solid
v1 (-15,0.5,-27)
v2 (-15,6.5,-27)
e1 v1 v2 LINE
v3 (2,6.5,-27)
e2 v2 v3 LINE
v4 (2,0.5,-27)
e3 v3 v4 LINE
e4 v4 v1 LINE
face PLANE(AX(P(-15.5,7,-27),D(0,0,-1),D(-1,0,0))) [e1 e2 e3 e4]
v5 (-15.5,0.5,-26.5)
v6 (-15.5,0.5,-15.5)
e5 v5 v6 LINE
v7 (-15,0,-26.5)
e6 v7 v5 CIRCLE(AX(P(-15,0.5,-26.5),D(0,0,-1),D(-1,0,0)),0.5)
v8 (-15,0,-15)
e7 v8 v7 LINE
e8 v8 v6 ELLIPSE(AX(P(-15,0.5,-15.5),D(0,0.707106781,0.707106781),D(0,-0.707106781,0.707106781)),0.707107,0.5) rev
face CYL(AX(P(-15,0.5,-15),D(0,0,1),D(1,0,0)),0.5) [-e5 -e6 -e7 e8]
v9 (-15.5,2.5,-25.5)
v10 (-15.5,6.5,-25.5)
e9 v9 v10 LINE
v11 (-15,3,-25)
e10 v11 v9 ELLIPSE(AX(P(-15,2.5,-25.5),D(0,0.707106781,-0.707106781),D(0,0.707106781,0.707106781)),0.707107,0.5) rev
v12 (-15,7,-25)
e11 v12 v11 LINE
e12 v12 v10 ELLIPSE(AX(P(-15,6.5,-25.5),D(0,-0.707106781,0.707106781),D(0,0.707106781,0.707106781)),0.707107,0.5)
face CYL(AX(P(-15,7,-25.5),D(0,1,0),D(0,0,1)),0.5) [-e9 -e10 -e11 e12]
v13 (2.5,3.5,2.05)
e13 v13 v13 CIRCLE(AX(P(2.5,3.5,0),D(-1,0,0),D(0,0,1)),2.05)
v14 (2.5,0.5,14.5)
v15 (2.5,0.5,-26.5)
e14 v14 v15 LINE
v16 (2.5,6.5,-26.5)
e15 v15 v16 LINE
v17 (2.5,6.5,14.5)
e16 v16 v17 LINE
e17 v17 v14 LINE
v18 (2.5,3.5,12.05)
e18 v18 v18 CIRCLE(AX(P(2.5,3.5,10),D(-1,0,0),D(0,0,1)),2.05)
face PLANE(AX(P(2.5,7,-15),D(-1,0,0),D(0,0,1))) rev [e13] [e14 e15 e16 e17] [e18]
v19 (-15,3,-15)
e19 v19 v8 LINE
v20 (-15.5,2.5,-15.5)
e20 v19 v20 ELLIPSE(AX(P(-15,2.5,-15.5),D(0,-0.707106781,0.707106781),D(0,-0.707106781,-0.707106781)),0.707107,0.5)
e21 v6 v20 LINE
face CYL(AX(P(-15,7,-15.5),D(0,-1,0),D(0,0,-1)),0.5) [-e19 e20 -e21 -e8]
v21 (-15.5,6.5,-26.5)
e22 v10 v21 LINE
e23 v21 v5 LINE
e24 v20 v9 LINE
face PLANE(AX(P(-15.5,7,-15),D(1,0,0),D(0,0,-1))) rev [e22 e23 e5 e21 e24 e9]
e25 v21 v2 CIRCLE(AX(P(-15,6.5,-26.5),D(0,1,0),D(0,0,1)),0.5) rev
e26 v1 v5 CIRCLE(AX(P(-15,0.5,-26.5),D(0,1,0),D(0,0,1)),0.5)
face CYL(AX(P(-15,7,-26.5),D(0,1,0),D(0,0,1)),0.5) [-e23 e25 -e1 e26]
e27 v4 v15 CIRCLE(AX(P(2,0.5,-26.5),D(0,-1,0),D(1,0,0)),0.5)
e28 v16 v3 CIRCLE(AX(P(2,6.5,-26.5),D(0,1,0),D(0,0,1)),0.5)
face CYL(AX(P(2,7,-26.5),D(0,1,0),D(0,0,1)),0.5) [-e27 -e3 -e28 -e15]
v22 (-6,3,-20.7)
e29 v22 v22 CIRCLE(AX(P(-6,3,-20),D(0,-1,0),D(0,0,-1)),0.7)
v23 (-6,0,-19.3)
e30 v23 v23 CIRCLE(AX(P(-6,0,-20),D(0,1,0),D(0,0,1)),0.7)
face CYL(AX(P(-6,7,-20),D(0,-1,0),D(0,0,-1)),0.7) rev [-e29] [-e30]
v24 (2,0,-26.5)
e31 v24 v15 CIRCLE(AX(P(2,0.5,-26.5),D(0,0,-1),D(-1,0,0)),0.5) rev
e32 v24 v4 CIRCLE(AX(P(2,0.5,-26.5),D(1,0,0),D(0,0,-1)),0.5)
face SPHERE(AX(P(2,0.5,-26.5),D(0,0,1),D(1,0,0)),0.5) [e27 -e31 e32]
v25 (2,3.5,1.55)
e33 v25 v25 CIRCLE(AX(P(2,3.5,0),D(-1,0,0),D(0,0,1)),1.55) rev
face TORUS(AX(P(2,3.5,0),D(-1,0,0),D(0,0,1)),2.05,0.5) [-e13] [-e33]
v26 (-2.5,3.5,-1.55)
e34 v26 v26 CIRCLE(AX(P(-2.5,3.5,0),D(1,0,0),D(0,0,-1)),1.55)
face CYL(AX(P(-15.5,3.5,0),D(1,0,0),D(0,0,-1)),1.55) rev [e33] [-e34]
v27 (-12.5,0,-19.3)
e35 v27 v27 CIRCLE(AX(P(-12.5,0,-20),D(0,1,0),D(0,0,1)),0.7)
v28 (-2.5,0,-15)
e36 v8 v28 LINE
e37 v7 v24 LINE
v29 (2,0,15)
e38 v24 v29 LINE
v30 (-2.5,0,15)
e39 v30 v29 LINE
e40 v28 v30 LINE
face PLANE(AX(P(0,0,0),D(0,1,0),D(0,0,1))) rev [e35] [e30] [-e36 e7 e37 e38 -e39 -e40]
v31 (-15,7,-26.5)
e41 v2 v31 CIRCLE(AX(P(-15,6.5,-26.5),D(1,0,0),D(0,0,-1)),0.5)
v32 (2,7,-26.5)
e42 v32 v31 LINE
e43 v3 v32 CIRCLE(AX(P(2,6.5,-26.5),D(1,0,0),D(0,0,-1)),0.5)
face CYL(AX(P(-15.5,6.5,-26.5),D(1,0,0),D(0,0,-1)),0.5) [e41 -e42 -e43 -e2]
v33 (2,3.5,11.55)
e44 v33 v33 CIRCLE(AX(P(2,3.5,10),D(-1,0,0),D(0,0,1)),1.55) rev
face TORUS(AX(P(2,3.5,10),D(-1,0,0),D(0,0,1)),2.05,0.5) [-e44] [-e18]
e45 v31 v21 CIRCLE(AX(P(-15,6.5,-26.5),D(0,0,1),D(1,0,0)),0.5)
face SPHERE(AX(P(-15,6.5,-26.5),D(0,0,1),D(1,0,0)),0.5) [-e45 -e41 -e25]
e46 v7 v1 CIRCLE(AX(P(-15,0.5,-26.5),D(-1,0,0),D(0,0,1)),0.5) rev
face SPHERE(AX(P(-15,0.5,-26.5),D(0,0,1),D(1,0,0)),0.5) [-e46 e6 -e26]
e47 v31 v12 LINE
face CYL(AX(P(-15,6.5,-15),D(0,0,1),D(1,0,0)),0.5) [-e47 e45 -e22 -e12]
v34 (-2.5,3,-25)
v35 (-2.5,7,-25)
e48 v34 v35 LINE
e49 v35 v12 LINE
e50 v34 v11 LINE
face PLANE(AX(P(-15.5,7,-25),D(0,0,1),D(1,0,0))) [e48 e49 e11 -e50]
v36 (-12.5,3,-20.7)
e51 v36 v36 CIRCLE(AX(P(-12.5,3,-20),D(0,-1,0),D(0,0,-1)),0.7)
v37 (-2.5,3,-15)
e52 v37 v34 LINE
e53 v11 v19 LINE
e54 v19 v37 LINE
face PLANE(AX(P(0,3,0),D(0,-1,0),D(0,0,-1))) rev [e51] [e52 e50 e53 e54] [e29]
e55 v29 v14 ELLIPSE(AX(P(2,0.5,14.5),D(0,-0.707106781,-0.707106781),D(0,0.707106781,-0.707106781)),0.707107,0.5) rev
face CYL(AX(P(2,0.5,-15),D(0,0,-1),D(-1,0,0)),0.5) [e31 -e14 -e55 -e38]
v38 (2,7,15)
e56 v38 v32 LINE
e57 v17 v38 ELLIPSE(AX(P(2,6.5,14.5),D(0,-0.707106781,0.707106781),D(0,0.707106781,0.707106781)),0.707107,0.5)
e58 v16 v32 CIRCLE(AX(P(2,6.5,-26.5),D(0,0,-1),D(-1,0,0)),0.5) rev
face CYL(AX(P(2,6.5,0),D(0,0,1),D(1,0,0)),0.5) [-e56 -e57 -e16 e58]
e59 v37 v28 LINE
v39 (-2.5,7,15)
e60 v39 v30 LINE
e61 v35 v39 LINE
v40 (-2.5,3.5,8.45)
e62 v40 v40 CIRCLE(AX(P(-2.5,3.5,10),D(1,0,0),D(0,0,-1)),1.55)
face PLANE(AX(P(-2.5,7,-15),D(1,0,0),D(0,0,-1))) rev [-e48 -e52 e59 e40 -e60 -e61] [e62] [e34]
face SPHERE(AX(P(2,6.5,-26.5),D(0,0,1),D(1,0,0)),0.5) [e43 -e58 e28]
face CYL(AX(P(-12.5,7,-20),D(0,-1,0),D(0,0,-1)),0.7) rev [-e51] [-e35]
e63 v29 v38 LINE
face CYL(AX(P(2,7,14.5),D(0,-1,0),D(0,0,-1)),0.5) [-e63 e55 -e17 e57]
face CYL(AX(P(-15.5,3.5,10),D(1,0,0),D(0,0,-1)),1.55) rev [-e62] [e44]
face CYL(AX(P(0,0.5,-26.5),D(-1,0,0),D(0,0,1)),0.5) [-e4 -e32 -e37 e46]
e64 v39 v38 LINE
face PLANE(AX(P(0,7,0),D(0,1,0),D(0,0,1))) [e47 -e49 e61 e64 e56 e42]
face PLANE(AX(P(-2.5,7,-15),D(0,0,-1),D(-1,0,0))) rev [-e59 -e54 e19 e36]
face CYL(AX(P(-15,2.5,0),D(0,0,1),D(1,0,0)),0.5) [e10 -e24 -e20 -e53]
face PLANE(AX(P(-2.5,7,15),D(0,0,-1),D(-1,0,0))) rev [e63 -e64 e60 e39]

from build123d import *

# Parameters (mm, degrees)
SKETCH_1_R          = 0.7
EXTRUDE_1_DEPTH     = 7
SKETCH_2_R          = 1.55
CUT_EXTRUDE_1_DEPTH = 32.591137998
SKETCH_3_W          = 13
SKETCH_3_H          = 10
CUT_EXTRUDE_2_DEPTH = 4
SKETCH_4_W          = 18
SKETCH_4_H          = 2
EXTRUDE_2_DEPTH     = 7
FILLET_1_R          = 0.5
FILLET_2_R          = 0.5


with BuildPart() as part:
    # 草图1 → 凸台-拉伸1 (new body)
    with BuildSketch(Plane(origin=(0, 0, 0), x_dir=(1, 0, 0), z_dir=(0, 1, 0))):
        Polygon((-2.5, 15), (-2.5, -15), (2.5, -15), (2.5, 15), (2.5, 25), (-15.5, 25), (-15.5, 15), align=None)
        with Locations(Location((-12.5, 20, 0), (0, 0, 270))):
            Circle(SKETCH_1_R, mode=Mode.SUBTRACT)
        with Locations(Location((-6, 20, 0), (0, 0, 270))):
            Circle(SKETCH_1_R, mode=Mode.SUBTRACT)
    extrude(amount=EXTRUDE_1_DEPTH)

    # 草图2 → 切除-拉伸1 (cut, through all)
    with BuildSketch(Plane(origin=(2.5, 0, 0), x_dir=(0, 0, -1), z_dir=(1, 0, 0))):
        with Locations((-10, 3.5)):
            Circle(SKETCH_2_R)
        with Locations((0, 3.5)):
            Circle(SKETCH_2_R)
    extrude(amount=-CUT_EXTRUDE_1_DEPTH, mode=Mode.SUBTRACT)

    # 草图3 → 切除-拉伸2 (cut)
    with BuildSketch(Plane(origin=(0, 7, 0), x_dir=(1, 0, 0), z_dir=(0, 1, 0))):
        with Locations((-9, 20)):
            Rectangle(SKETCH_3_W, SKETCH_3_H)
    extrude(amount=-CUT_EXTRUDE_2_DEPTH, mode=Mode.SUBTRACT)

    # 草图4 → 凸台-拉伸2 (add)
    with BuildSketch(Plane.XZ):
        with Locations((-6.5, -26)):
            Rectangle(SKETCH_4_W, SKETCH_4_H)
    extrude(amount=-EXTRUDE_2_DEPTH)

    # 圆角1
    fillet_1_edges = [part.edges().sort_by_distance(p)[0] for p in [
        (2.5, 3.5, 15),
        (2.5, 3.5, 11.55),
        (2.5, 3.5, 1.55),
        (2.5, 7, -6),
        (-15.5, 3.5, -27),
        (-6.5, 7, -27),
        (2.5, 3.5, -27),
        (-6.5, 0, -27),
        (2.5, 0, -6),
    ]]
    fillet(fillet_1_edges, radius=FILLET_1_R)

    # 圆角2
    # the kernel refuses this fillet: 0.5 mm, written as the material it takes off along each edge
    with BuildSketch(Plane(origin=(-15, 6.5, -26.5), x_dir=(-1, 0, 0), z_dir=(0, 1, 0))) as fillet_2_piece_1_section:
        Polygon((0, 0), (FILLET_2_R, 0), (FILLET_2_R, -FILLET_2_R), (0, -FILLET_2_R), align=None)
    fillet_2_piece_1 = extrude(amount=FILLET_2_R, mode=Mode.PRIVATE)
    fillet_2_piece_1 = fillet_2_piece_1 - Plane(origin=(-15, 6.5, -26.5), x_dir=(0.7071067811865475, 0, 0.7071067811865475), z_dir=(0, 1, 0)) * Sphere(FILLET_2_R, mode=Mode.PRIVATE)
    add(fillet_2_piece_1, mode=Mode.SUBTRACT)
    with BuildSketch(Plane(origin=(-15, 0.5, -26.5), x_dir=(-1, 0, 0), z_dir=(0, -1, 0))) as fillet_2_piece_2_section:
        Polygon((0, 0), (FILLET_2_R, 0), (FILLET_2_R, FILLET_2_R), (0, FILLET_2_R), align=None)
    fillet_2_piece_2 = extrude(amount=FILLET_2_R, mode=Mode.PRIVATE)
    fillet_2_piece_2 = fillet_2_piece_2 - Plane(origin=(-15, 0.5, -26.5), x_dir=(0.7071067811865475, 0, 0.7071067811865475), z_dir=(0, -1, 0)) * Sphere(FILLET_2_R, mode=Mode.PRIVATE)
    add(fillet_2_piece_2, mode=Mode.SUBTRACT)
    with BuildSketch(Plane(origin=(-15.5, -1.25, -15), x_dir=(1, 0, 0), z_dir=(0, 1, 0))) as fillet_2_piece_3:
        with BuildLine():
            CenterArc((FILLET_2_R, FILLET_2_R), FILLET_2_R, 180, 90)
            Line((0, FILLET_2_R), (0, 0))
            Line((0, 0), (FILLET_2_R, 0))
        make_face()
    extrude(amount=5.5, mode=Mode.SUBTRACT)
    with BuildSketch(Plane(origin=(-15.5, 3, -25), x_dir=(1, 0, 0), z_dir=(0, 0, 1))) as fillet_2_piece_4:
        with BuildLine():
            CenterArc((FILLET_2_R, -FILLET_2_R), FILLET_2_R, 90, 90)
            Line((0, -FILLET_2_R), (0, 0))
            Line((0, 0), (FILLET_2_R, 0))
        make_face()
    extrude(amount=11.25, mode=Mode.SUBTRACT)
    with BuildSketch(Plane(origin=(-15.5, 3, -25), x_dir=(1, 0, 0), z_dir=(0, 1, 0))) as fillet_2_piece_5:
        with BuildLine():
            CenterArc((FILLET_2_R, FILLET_2_R), FILLET_2_R, 180, 90)
            Line((0, FILLET_2_R), (0, 0))
            Line((0, 0), (FILLET_2_R, 0))
        make_face()
    extrude(amount=5.25, mode=Mode.SUBTRACT)
    with BuildSketch(Plane(origin=(-15.5, 7, -26.5), x_dir=(1, 0, 0), z_dir=(0, 0, 1))) as fillet_2_piece_6:
        with BuildLine():
            CenterArc((FILLET_2_R, -FILLET_2_R), FILLET_2_R, 90, 90)
            Line((0, -FILLET_2_R), (0, 0))
            Line((0, 0), (FILLET_2_R, 0))
        make_face()
    extrude(amount=2.75, mode=Mode.SUBTRACT)
    with BuildSketch(Plane(origin=(-15.5, 0, -13.75), x_dir=(1, 0, 0), z_dir=(0, 0, -1))) as fillet_2_piece_7:
        with BuildLine():
            CenterArc((FILLET_2_R, -FILLET_2_R), FILLET_2_R, 90, 90)
            Line((0, -FILLET_2_R), (0, 0))
            Line((0, 0), (FILLET_2_R, 0))
        make_face()
    extrude(amount=12.75, mode=Mode.SUBTRACT)
    with BuildSketch(Plane(origin=(-15.5, 3, -26.25), x_dir=(1, 0, 0), z_dir=(0, 0, 1))) as fillet_2_piece_8a_section:
        with BuildLine():
            CenterArc((FILLET_2_R, -FILLET_2_R), FILLET_2_R, 90, 90)
            Line((0, -FILLET_2_R), (0, 0))
            Line((0, 0), (FILLET_2_R, 0))
        make_face()
    fillet_2_piece_8a = extrude(amount=12.5, mode=Mode.PRIVATE)
    fillet_2_piece_8a = split(fillet_2_piece_8a, bisect_by=Plane(origin=(-15.386802443, 2.886802443, -25), z_dir=(0, 0, -1)), keep=Keep.TOP, mode=Mode.PRIVATE)
    with BuildSketch(Plane(origin=(-15.5, 1.75, -25), x_dir=(1, 0, 0), z_dir=(0, 1, 0))) as fillet_2_piece_8b_section:
        with BuildLine():
            CenterArc((FILLET_2_R, FILLET_2_R), FILLET_2_R, 180, 90)
            Line((0, FILLET_2_R), (0, 0))
            Line((0, 0), (FILLET_2_R, 0))
        make_face()
    fillet_2_piece_8b = extrude(amount=6.5, mode=Mode.PRIVATE)
    fillet_2_piece_8b = split(fillet_2_piece_8b, bisect_by=Plane(origin=(-15.386802443, 3, -25.113197557), z_dir=(0, -1, 0)), keep=Keep.TOP, mode=Mode.PRIVATE)
    fillet_2_piece_8 = fillet_2_piece_8a & fillet_2_piece_8b
    add(fillet_2_piece_8, mode=Mode.SUBTRACT)


solid = part.part
